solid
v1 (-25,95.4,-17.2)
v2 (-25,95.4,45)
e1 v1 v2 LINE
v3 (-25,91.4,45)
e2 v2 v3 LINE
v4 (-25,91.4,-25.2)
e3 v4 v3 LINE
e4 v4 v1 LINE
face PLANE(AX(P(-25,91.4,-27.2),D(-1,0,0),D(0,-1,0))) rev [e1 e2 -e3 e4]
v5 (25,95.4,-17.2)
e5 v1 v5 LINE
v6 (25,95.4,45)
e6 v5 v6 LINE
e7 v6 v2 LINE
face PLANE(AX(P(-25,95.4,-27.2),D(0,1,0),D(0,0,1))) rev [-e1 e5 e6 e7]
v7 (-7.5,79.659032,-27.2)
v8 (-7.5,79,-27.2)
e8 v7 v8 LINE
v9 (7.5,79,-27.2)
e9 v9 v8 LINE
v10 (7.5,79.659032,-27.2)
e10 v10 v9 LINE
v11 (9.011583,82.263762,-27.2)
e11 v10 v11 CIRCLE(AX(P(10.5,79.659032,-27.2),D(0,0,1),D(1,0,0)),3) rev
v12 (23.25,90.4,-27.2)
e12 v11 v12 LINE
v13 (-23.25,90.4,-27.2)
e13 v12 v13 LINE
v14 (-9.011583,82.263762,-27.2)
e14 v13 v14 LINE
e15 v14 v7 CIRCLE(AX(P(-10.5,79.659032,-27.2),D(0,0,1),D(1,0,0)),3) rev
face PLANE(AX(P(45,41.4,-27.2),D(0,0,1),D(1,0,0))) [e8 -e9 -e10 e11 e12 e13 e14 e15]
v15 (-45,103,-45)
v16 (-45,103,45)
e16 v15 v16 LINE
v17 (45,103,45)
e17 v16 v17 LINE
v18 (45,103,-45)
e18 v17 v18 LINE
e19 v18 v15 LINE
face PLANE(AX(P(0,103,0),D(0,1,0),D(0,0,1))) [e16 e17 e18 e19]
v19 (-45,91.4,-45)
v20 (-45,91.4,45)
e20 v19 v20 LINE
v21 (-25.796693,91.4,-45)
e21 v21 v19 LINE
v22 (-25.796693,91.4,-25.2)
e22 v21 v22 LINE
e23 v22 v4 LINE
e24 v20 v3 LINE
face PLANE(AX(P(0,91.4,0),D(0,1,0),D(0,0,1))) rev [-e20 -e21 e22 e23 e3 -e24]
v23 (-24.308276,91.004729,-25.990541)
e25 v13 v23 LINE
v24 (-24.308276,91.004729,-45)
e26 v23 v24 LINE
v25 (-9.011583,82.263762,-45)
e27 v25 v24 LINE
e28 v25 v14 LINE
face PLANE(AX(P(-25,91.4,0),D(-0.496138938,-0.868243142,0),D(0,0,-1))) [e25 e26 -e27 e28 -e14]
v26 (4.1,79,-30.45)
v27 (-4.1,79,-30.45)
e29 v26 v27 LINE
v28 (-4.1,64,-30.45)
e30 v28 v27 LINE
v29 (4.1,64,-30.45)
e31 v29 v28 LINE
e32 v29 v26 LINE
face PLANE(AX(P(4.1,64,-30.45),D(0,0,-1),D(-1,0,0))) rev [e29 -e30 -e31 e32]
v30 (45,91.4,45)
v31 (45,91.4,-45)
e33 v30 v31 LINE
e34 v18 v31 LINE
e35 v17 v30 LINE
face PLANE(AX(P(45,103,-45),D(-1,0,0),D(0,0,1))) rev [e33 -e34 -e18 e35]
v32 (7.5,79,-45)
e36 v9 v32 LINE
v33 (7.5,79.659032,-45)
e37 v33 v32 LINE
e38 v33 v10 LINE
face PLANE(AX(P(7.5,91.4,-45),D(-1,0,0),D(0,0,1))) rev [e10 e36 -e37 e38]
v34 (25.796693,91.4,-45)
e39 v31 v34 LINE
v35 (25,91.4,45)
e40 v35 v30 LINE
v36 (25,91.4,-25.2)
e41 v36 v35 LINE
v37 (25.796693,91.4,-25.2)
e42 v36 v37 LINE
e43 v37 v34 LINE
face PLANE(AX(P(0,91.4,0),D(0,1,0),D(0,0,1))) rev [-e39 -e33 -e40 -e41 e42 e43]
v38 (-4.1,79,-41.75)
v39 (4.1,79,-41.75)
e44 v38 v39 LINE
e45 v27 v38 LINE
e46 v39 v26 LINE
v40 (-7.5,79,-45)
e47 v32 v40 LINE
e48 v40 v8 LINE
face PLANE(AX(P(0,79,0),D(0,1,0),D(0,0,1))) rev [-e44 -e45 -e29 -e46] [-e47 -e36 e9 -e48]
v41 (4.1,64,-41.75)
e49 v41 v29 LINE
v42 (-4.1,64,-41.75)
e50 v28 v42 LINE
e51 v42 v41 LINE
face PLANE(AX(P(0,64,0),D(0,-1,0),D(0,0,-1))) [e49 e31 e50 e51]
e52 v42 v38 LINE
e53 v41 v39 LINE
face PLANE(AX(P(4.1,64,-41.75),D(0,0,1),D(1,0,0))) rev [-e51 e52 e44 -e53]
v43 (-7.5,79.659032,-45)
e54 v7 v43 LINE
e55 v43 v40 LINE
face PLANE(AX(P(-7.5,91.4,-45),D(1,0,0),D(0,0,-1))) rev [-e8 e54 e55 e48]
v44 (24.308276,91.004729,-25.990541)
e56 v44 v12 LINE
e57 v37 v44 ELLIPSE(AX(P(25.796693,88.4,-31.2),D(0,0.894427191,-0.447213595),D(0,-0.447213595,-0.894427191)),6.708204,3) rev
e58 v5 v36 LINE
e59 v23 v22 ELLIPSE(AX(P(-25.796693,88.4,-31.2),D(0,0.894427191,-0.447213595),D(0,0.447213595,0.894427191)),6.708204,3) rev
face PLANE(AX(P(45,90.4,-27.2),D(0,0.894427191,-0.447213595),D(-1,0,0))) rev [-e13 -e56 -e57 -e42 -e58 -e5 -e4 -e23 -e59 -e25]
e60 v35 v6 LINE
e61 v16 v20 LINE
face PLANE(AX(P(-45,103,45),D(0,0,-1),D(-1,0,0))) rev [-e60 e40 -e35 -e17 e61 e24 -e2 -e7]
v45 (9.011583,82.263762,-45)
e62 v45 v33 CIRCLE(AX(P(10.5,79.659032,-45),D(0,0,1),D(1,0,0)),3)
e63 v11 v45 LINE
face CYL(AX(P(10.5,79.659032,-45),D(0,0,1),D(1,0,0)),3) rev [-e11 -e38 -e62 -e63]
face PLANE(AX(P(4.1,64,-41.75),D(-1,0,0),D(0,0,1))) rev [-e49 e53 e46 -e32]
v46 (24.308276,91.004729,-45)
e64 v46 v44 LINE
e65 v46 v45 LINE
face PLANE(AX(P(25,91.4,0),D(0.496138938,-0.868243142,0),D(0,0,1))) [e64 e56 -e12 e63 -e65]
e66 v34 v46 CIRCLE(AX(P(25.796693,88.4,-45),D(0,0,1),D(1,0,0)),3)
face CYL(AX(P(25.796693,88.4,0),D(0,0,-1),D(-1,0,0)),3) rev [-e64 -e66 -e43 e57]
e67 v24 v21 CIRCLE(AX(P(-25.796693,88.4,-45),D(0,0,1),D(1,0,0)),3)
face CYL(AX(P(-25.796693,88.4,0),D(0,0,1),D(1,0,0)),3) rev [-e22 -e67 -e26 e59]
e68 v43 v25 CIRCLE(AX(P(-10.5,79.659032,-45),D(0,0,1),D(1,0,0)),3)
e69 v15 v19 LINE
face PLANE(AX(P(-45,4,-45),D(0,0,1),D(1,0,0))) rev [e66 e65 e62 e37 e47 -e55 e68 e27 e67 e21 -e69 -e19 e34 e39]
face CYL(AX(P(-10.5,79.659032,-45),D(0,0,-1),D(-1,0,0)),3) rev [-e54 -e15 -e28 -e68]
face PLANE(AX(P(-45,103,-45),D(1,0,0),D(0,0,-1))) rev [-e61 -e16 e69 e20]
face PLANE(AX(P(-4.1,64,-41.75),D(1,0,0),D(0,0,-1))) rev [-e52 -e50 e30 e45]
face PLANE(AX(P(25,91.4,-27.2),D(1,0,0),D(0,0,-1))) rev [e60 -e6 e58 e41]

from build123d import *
from OCP.BRepFilletAPI import BRepFilletAPI_MakeChamfer

# Parameters (mm, degrees)
ESQUISSE2_W             = 90
ESQUISSE2_H             = 90
BOSS_EXTRU_1_DEPTH      = 4
ESQUISSE3_W             = 9.2
ESQUISSE3_H             = 10.3
BOSS_EXTRU_2_DEPTH      = 2.4
CONG_1_R                = 1
ESQUISSE5_W             = 14.85
ESQUISSE5_H             = 90
BOSS_EXTRU_3_DEPTH      = 2.4
ESQUISSE6_W             = 7
ESQUISSE6_H             = 5
BOSS_EXTRU_4_DEPTH      = 38
ESQUISSE8_W             = 14.85
ESQUISSE8_H             = 18
BOSS_EXTRU_5_DEPTH      = 38
BOSS_EXTRU_6_REACH      = 97.814
ESQUISSE9_W             = 7
ESQUISSE9_H             = 2
CONG_1_OF_SYM_TRIE1_R   = 1
ENL_V_MAT_EXTRU_1_REACH = 111.983
ESQUISSE10_W            = 2
ESQUISSE10_H            = 18
ENL_V_MAT_EXTRU_2_REACH = 77.38
ESQUISSE11_W            = 40
ESQUISSE11_H            = 18
ESQUISSE12_W            = 5
ESQUISSE12_H            = 8.6
BOSS_EXTRU_7_DEPTH      = 60.3
ESQUISSE13_W            = 6.9
ESQUISSE13_H            = 7.6
BOSS_EXTRU_8_DEPTH      = 2.45
CONG_2_R                = 1
CONG_2_OF_SYM_TRIE2_R   = 1
BOSS_EXTRU_9_DEPTH      = 3
BOSS_EXTRU_9_DEPTH_BACK = 3
ESQUISSE14_W            = 90
ESQUISSE14_H            = 17.8
ESQUISSE15_W            = 15
ESQUISSE15_H            = 17.8
BOSS_EXTRU_10_DEPTH     = 44
ESQUISSE16_W            = 90
ESQUISSE16_H            = 90
BOSS_EXTRU_11_DEPTH     = 11.6
ESQUISSE20_W            = 12
ESQUISSE20_H            = 6.4
BOSS_EXTRU_13_DEPTH     = 10
ESQUISSE21_W            = 12
ESQUISSE21_H            = 6.4
BOSS_EXTRU_14_DEPTH     = 10
CONG_3_R                = 6
ENL_V_MAT_EXTRU_4_REACH = 126.022
ESQUISSE23_R            = 2.3
CONG_3_OF_SYM_TRIE3_R   = 6
ENL_V_MAT_EXTRU_5_REACH = 126.022
ESQUISSE24_R            = 1.75
ENL_V_MAT_EXTRU_6_REACH = 137.909
ESQUISSE26_R            = 1.75
ESQUISSE27_W            = 50
ESQUISSE27_H            = 4
ENL_V_MAT_EXTRU_7_DEPTH = 72.2
CHANFREIN3_SIZE         = 28.5
CHANFREIN3_SIZE2        = 9.5
CHANFREIN4_SIZE         = 10
CHANFREIN4_SIZE2        = 17.5
CHANFREIN8_START        = -45
CHANFREIN8_DEPTH        = 17.8
CHANFREIN9_SIZE         = 3
CHANFREIN9_SIZE_2       = 9
CHANFREIN10_START       = 25.930676813
CHANFREIN10_OUTLINE_W   = 40
CHANFREIN10_OUTLINE_H   = 3.16227766
CHANFREIN10_DEPTH       = 2.069323187
CONG_9_R                = 3
ESQUISSE37_R            = 4
ENL_V_MAT_EXTRU_8_DEPTH = 3
BOSS_EXTRU_15_DEPTH     = 4.8
CONG_11_R               = 3
CHANFREIN14_SIZE        = 10
CHANFREIN14_SIZE2       = 5
ESQUISSE39_W            = 110.537037217
ESQUISSE39_H            = 103.424550411
ENL_V_MAT_EXTRU_9_DEPTH = 79
ESQUISSE40_W            = 8.2
ESQUISSE40_H            = 11.3
BOSS_EXTRU_16_DEPTH     = 15


with BuildPart() as part:
    # Esquisse2 → Boss.-Extru.1 (new body)
    with BuildSketch(Plane(origin=(0, 0, 0), x_dir=(1, 0, 0), z_dir=(0, 1, 0))):
        Rectangle(ESQUISSE2_W, ESQUISSE2_H)
    extrude(amount=BOSS_EXTRU_1_DEPTH)

    # Esquisse3 → Boss.-Extru.2 (add)
    with BuildSketch(Plane(origin=(0, 4, 0), x_dir=(1, 0, 0), z_dir=(0, 1, 0))):
        with Locations((25.55, -6)):
            Rectangle(ESQUISSE3_W, ESQUISSE3_H)
    boss_extru_2 = extrude(amount=BOSS_EXTRU_2_DEPTH)

    # Congé1
    cong_1_edges = [part.edges().sort_by_distance(p)[0] for p in [
        (20.95, 5.2, 0.85),
        (20.95, 5.2, 11.15),
    ]]
    fillet(cong_1_edges, radius=CONG_1_R)

    # Esquisse5 → Boss.-Extru.3 (add)
    with BuildSketch(Plane(origin=(0, 4, 0), x_dir=(1, 0, 0), z_dir=(0, 1, 0))):
        with Locations((37.575, 0)):
            Rectangle(ESQUISSE5_W, ESQUISSE5_H)
    boss_extru_3 = extrude(amount=BOSS_EXTRU_3_DEPTH)

    # Esquisse6 → Boss.-Extru.4 (add)
    with BuildSketch(Plane(origin=(0, 6.4, 0), x_dir=(1, 0, 0), z_dir=(0, 1, 0))):
        with Locations((33.65, -42.5)):
            Rectangle(ESQUISSE6_W, ESQUISSE6_H)
    boss_extru_4 = extrude(amount=BOSS_EXTRU_4_DEPTH)

    # Esquisse8 → Boss.-Extru.5 (add)
    with BuildSketch(Plane(origin=(0, 6.4, 0), x_dir=(1, 0, 0), z_dir=(0, 1, 0))):
        with Locations((37.575, 36)):
            Rectangle(ESQUISSE8_W, ESQUISSE8_H)
    boss_extru_5 = extrude(amount=BOSS_EXTRU_5_DEPTH)

    # Esquisse9 → Boss.-Extru.6 (add, up to next)
    with BuildSketch(Plane.XY.offset(-27), mode=Mode.PRIVATE) as boss_extru_6_sk1:
        with Locations((33.65, 43.4)):
            Rectangle(ESQUISSE9_W, ESQUISSE9_H)
    boss_extru_6_tool1 = extrude(boss_extru_6_sk1.sketch, amount=BOSS_EXTRU_6_REACH, mode=Mode.PRIVATE) - part.part
    boss_extru_6 = boss_extru_6_tool1.solids().sort_by_distance((33.65, 43.4, -27))[0]
    add(boss_extru_6)

    # Symétrie1: Boss.-Extru.2, Boss.-Extru.3, Boss.-Extru.4, Boss.-Extru.5, Boss.-Extru.6 across plane
    add(boss_extru_2.mirror(Plane(origin=(0, 0, 0), x_dir=(0, 0, 1), z_dir=(1, 0, 0))))
    add(boss_extru_3.mirror(Plane(origin=(0, 0, 0), x_dir=(0, 0, 1), z_dir=(1, 0, 0))))
    add(boss_extru_4.mirror(Plane(origin=(0, 0, 0), x_dir=(0, 0, 1), z_dir=(1, 0, 0))))
    add(boss_extru_5.mirror(Plane(origin=(0, 0, 0), x_dir=(0, 0, 1), z_dir=(1, 0, 0))))
    add(boss_extru_6.mirror(Plane(origin=(0, 0, 0), x_dir=(0, 0, 1), z_dir=(1, 0, 0))))

    # Congé1 of Symétrie1
    cong_1_of_sym_trie1_edges = [part.edges().sort_by_distance(p)[0] for p in [
        (-20.95, 5.2, 0.85),
        (-20.95, 5.2, 11.15),
    ]]
    fillet(cong_1_of_sym_trie1_edges, radius=CONG_1_OF_SYM_TRIE1_R)

    # Esquisse10 → Enlèv. mat.-Extru.1 (cut, up to next)
    with BuildSketch(Plane.XY.offset(45), mode=Mode.PRIVATE) as enl_v_mat_extru_1_sk1:
        with Locations((-31.15, 26.85)):
            Rectangle(ESQUISSE10_W, ESQUISSE10_H)
    enl_v_mat_extru_1_tool1 = extrude(enl_v_mat_extru_1_sk1.sketch, amount=-ENL_V_MAT_EXTRU_1_REACH, mode=Mode.PRIVATE) & part.part
    add(enl_v_mat_extru_1_tool1.solids().sort_by_distance((-31.15, 26.85, 45))[0], mode=Mode.SUBTRACT)

    # Esquisse11 → Enlèv. mat.-Extru.2 (cut, up to next)
    with BuildSketch(Plane(origin=(0, 4, 0), x_dir=(1, 0, 0), z_dir=(0, 1, 0)), mode=Mode.PRIVATE) as enl_v_mat_extru_2_sk1:
        with Locations((0, 36)):
            Rectangle(ESQUISSE11_W, ESQUISSE11_H)
    enl_v_mat_extru_2_tool1 = extrude(enl_v_mat_extru_2_sk1.sketch, amount=-ENL_V_MAT_EXTRU_2_REACH, mode=Mode.PRIVATE) & part.part
    add(enl_v_mat_extru_2_tool1.solids().sort_by_distance((0, 4, -36))[0], mode=Mode.SUBTRACT)

    # Esquisse12 → Boss.-Extru.7 (add)
    with BuildSketch(Plane(origin=(-30.15, 0, 0), x_dir=(0, 0, -1), z_dir=(1, 0, 0))):
        with Locations((29.5, 29.34)):
            Rectangle(ESQUISSE12_W, ESQUISSE12_H)
    extrude(amount=BOSS_EXTRU_7_DEPTH)

    # Esquisse13 → Boss.-Extru.8 (add)
    with BuildSketch(Plane.XY.offset(-27)):
        with Locations((24.4, 29.84)):
            Rectangle(ESQUISSE13_W, ESQUISSE13_H)
    boss_extru_8 = extrude(amount=BOSS_EXTRU_8_DEPTH)

    # Congé2
    cong_2_edges = [part.edges().sort_by_distance(p)[0] for p in [
        (20.95, 33.64, -25.775),
        (20.95, 26.04, -25.775),
    ]]
    fillet(cong_2_edges, radius=CONG_2_R)

    # Symétrie2: Boss.-Extru.8 across plane
    add(boss_extru_8.mirror(Plane(origin=(0, 0, 0), x_dir=(0, 0, 1), z_dir=(1, 0, 0))))

    # Congé2 of Symétrie2
    cong_2_of_sym_trie2_edges = [part.edges().sort_by_distance(p)[0] for p in [
        (-20.95, 33.64, -25.775),
        (-20.95, 26.04, -25.775),
    ]]
    fillet(cong_2_of_sym_trie2_edges, radius=CONG_2_OF_SYM_TRIE2_R)

    # Esquisse14 → Boss.-Extru.9 (add, two sides: drawn at the far end of the back side and taken through both)
    with BuildSketch(Plane(origin=(0, 44.4, 0), x_dir=(1, 0, 0), z_dir=(0, 1, 0)).offset(-BOSS_EXTRU_9_DEPTH_BACK)):
        with Locations((0, 36.1)):
            Rectangle(ESQUISSE14_W, ESQUISSE14_H)
    extrude(amount=BOSS_EXTRU_9_DEPTH + BOSS_EXTRU_9_DEPTH_BACK)

    # Esquisse15 → Boss.-Extru.10 (add)
    with BuildSketch(Plane(origin=(0, 47.4, 0), x_dir=(1, 0, 0), z_dir=(0, 1, 0))):
        with Locations((0, 36.1)):
            Rectangle(ESQUISSE15_W, ESQUISSE15_H)
    extrude(amount=BOSS_EXTRU_10_DEPTH)

    # Esquisse16 → Boss.-Extru.11 (add)
    with BuildSketch(Plane(origin=(0, 91.4, 0), x_dir=(1, 0, 0), z_dir=(0, 1, 0))):
        Rectangle(ESQUISSE16_W, ESQUISSE16_H)
    extrude(amount=BOSS_EXTRU_11_DEPTH)

    # Esquisse20 → Boss.-Extru.13 (add)
    with BuildSketch(Plane(origin=(45, 0, 0), x_dir=(0, 0, -1), z_dir=(1, 0, 0))):
        with Locations((-11, 3.2)):
            Rectangle(ESQUISSE20_W, ESQUISSE20_H)
    boss_extru_13 = extrude(amount=BOSS_EXTRU_13_DEPTH)

    # Esquisse21 → Boss.-Extru.14 (add)
    with BuildSketch(Plane(origin=(0, 0, -45), x_dir=(-1, 0, 0), z_dir=(0, 0, -1))):
        with Locations((-39, 3.2)):
            Rectangle(ESQUISSE21_W, ESQUISSE21_H)
    boss_extru_14 = extrude(amount=BOSS_EXTRU_14_DEPTH)

    # Congé3
    cong_3_edges = [part.edges().sort_by_distance(p)[0] for p in [
        (33, 3.2, -55),
        (45, 3.2, -55),
        (55, 3.2, 5),
        (55, 3.2, 17),
    ]]
    fillet(cong_3_edges, radius=CONG_3_R - 0.0001)  # a hair under: the kernel refuses the full size

    # Esquisse23 → Enlèv. mat.-Extru.4 (cut, up to next)
    with BuildSketch(Plane(origin=(0, 6.4, 0), x_dir=(1, 0, 0), z_dir=(0, 1, 0)), mode=Mode.PRIVATE) as enl_v_mat_extru_4_sk1:
        with Locations(Location((50, -11, 0), (0, 0, 270))):
            Circle(ESQUISSE23_R)
    enl_v_mat_extru_4_tool1 = extrude(enl_v_mat_extru_4_sk1.sketch, amount=-ENL_V_MAT_EXTRU_4_REACH, mode=Mode.PRIVATE) & part.part
    # Esquisse23 → Enlèv. mat.-Extru.4 (cut, up to next)
    with BuildSketch(Plane(origin=(0, 6.4, 0), x_dir=(1, 0, 0), z_dir=(0, 1, 0)), mode=Mode.PRIVATE) as enl_v_mat_extru_4_sk2:
        with Locations(Location((39, 50, 0), (0, 0, 270))):
            Circle(ESQUISSE23_R)
    enl_v_mat_extru_4_tool2 = extrude(enl_v_mat_extru_4_sk2.sketch, amount=-ENL_V_MAT_EXTRU_4_REACH, mode=Mode.PRIVATE) & part.part
    enl_v_mat_extru_4_1 = enl_v_mat_extru_4_tool1.solids().sort_by_distance((50, 6.4, 11))[0]
    add(enl_v_mat_extru_4_1, mode=Mode.SUBTRACT)
    enl_v_mat_extru_4_2 = enl_v_mat_extru_4_tool2.solids().sort_by_distance((39, 6.4, -50))[0]
    add(enl_v_mat_extru_4_2, mode=Mode.SUBTRACT)
    enl_v_mat_extru_4 = enl_v_mat_extru_4_1 + enl_v_mat_extru_4_2  # Enlèv. mat.-Extru.4 as one shape, for the pattern or mirror that repeats it

    # Symétrie3: Boss.-Extru.13, Boss.-Extru.14, Enlèv. mat.-Extru.4 across plane
    add(boss_extru_13.mirror(Plane(origin=(0, 0, 0), x_dir=(0, 0, 1), z_dir=(1, 0, 0))))
    add(boss_extru_14.mirror(Plane(origin=(0, 0, 0), x_dir=(0, 0, 1), z_dir=(1, 0, 0))))
    add(enl_v_mat_extru_4.mirror(Plane(origin=(0, 0, 0), x_dir=(0, 0, 1), z_dir=(1, 0, 0))), mode=Mode.SUBTRACT)

    # Congé3 of Symétrie3
    cong_3_of_sym_trie3_edges = [part.edges().sort_by_distance(p)[0] for p in [
        (-33, 3.2, -55),
        (-45, 3.2, -55),
        (-55, 3.2, 5),
        (-55, 3.2, 17),
    ]]
    fillet(cong_3_of_sym_trie3_edges, radius=CONG_3_OF_SYM_TRIE3_R - 0.0001)  # a hair under: the kernel refuses the full size

    # Esquisse24 → Enlèv. mat.-Extru.5 (cut, up to next)
    with BuildSketch(Plane(origin=(0, 6.4, 0), x_dir=(1, 0, 0), z_dir=(0, 1, 0)), mode=Mode.PRIVATE) as enl_v_mat_extru_5_sk1:
        with Locations(Location((25.45, -6, 0), (0, 0, 270))):
            Circle(ESQUISSE24_R)
    enl_v_mat_extru_5_tool1 = extrude(enl_v_mat_extru_5_sk1.sketch, amount=-ENL_V_MAT_EXTRU_5_REACH, mode=Mode.PRIVATE) & part.part
    enl_v_mat_extru_5 = enl_v_mat_extru_5_tool1.solids().sort_by_distance((25.45, 6.4, 6))[0]
    add(enl_v_mat_extru_5, mode=Mode.SUBTRACT)

    # Esquisse26 → Enlèv. mat.-Extru.6 (cut, up to next)
    with BuildSketch(Plane.XY.offset(-24.55), mode=Mode.PRIVATE) as enl_v_mat_extru_6_sk1:
        with Locations((25.55, 28.44)):
            Circle(ESQUISSE26_R)
    enl_v_mat_extru_6_tool1 = extrude(enl_v_mat_extru_6_sk1.sketch, amount=-ENL_V_MAT_EXTRU_6_REACH, mode=Mode.PRIVATE) & part.part
    enl_v_mat_extru_6 = enl_v_mat_extru_6_tool1.solids().sort_by_distance((25.55, 28.44, -24.55))[0]
    add(enl_v_mat_extru_6, mode=Mode.SUBTRACT)

    # Symétrie5: Enlèv. mat.-Extru.5, Enlèv. mat.-Extru.6 across plane
    add(enl_v_mat_extru_5.mirror(Plane(origin=(0, 0, 0), x_dir=(0, 0, 1), z_dir=(1, 0, 0))), mode=Mode.SUBTRACT)
    add(enl_v_mat_extru_6.mirror(Plane(origin=(0, 0, 0), x_dir=(0, 0, 1), z_dir=(1, 0, 0))), mode=Mode.SUBTRACT)

    # Esquisse27 → Enlèv. mat.-Extru.7 (cut)
    with BuildSketch(Plane.XY.offset(45)):
        with Locations((0, 93.4)):
            Rectangle(ESQUISSE27_W, ESQUISSE27_H)
    extrude(amount=-ENL_V_MAT_EXTRU_7_DEPTH, mode=Mode.SUBTRACT)

    # Chanfrein3: one chamfer whose edges measure the first distance from different faces: ONE call of the kernel's chamfer builder (chamfer() names one face for all edges)
    chanfrein3_edges_1 = [part.edges().sort_by_distance(p)[0] for p in [
        (-7.5, 47.4, -36.1),
    ]]
    chanfrein3_side_1 = [part.faces().sort_by_distance(p)[0] for p in [
        (-26.25, 47.4, -36.1),
    ]]
    chanfrein3_edges_2 = [part.edges().sort_by_distance(p)[0] for p in [
        (7.5, 47.4, -36.1),
    ]]
    chanfrein3_side_2 = [part.faces().sort_by_distance(p)[0] for p in [
        (26.25, 47.4, -36.1),
    ]]
    chanfrein3 = BRepFilletAPI_MakeChamfer(part.part.solid().wrapped)
    for e in chanfrein3_edges_1:
        chanfrein3.Add(CHANFREIN3_SIZE, CHANFREIN3_SIZE2, e.wrapped, chanfrein3_side_1[0].wrapped)  # the first distance lies on this face
    for e in chanfrein3_edges_2:
        chanfrein3.Add(CHANFREIN3_SIZE, CHANFREIN3_SIZE2, e.wrapped, chanfrein3_side_2[0].wrapped)  # the first distance lies on this face
    add(Compound.cast(chanfrein3.Shape()), mode=Mode.REPLACE)

    # Chanfrein4: one chamfer whose edges measure the first distance from different faces: ONE call of the kernel's chamfer builder (chamfer() names one face for all edges)
    chanfrein4_edges_1 = [part.edges().sort_by_distance(p)[0] for p in [
        (7.5, 91.4, -36.1),
    ]]
    chanfrein4_side_1 = [part.faces().sort_by_distance(p)[0] for p in [
        (7.5, 74.15, -36.1),
    ]]
    chanfrein4_edges_2 = [part.edges().sort_by_distance(p)[0] for p in [
        (-7.5, 91.4, -36.1),
    ]]
    chanfrein4_side_2 = [part.faces().sort_by_distance(p)[0] for p in [
        (-7.5, 74.15, -36.1),
    ]]
    chanfrein4 = BRepFilletAPI_MakeChamfer(part.part.solid().wrapped)
    for e in chanfrein4_edges_1:
        chanfrein4.Add(CHANFREIN4_SIZE, CHANFREIN4_SIZE2, e.wrapped, chanfrein4_side_1[0].wrapped)  # the first distance lies on this face
    for e in chanfrein4_edges_2:
        chanfrein4.Add(CHANFREIN4_SIZE, CHANFREIN4_SIZE2, e.wrapped, chanfrein4_side_2[0].wrapped)  # the first distance lies on this face
    add(Compound.cast(chanfrein4.Shape()), mode=Mode.REPLACE)

    # Chanfrein8: read off the stored shape, not the designer's step
    # Chanfrein8 outline → Chanfrein8 (add)
    with BuildSketch(Plane.XY.offset(CHANFREIN8_START)):
        Polygon((30.15, 31.35), (30.15, 41.4), (0, 41.4), align=None)
    extrude(amount=CHANFREIN8_DEPTH)

    # Chanfrein9
    chanfrein9_edges_1 = [part.edges().sort_by_distance(p)[0] for p in [
        (45, 47.4, -36.1),
    ]]
    chanfrein9_side_1 = [part.faces().sort_by_distance(p)[0] for p in [
        (45, 47.34, -36.1),
    ]]
    chanfrein9_edges_2 = [part.edges().sort_by_distance(p)[0] for p in [
        (-45, 47.4, -36.1),
    ]]
    chanfrein9_side_2 = [part.faces().sort_by_distance(p)[0] for p in [
        (-44.94, 47.4, -36.1),
    ]]
    chanfrein9 = BRepFilletAPI_MakeChamfer(part.part.solid().wrapped)
    for e in chanfrein9_edges_1:
        chanfrein9.Add(CHANFREIN9_SIZE - 0.0001, CHANFREIN9_SIZE_2 - 0.0001, e.wrapped, chanfrein9_side_1[0].wrapped)
    for e in chanfrein9_edges_2:
        chanfrein9.Add(CHANFREIN9_SIZE_2 - 0.0001, CHANFREIN9_SIZE - 0.0001, e.wrapped, chanfrein9_side_2[0].wrapped)
    add(Compound.cast(chanfrein9.Shape()), mode=Mode.REPLACE)  # a hair under: the kernel refuses the full size

    # Chanfrein10: read off the stored shape, not the designer's step
    # Chanfrein10 outline → Chanfrein10 (cut)
    with BuildSketch(Plane(origin=(0, 0, 0), x_dir=(1, 0, 0), z_dir=(0, 0.31622776601683705, -0.9486832980505141)).offset(CHANFREIN10_START)):
        with Locations((0, 6.008327554)):
            Rectangle(CHANFREIN10_OUTLINE_W, CHANFREIN10_OUTLINE_H)
    extrude(amount=CHANFREIN10_DEPTH, mode=Mode.SUBTRACT)

    # Congé9
    cong_9_edges = [part.edges().sort_by_distance(p)[0] for p in [
        (-33.65, 44.4, 45),
        (-33.65, 6.4, 40),
        (-37.575, 6.4, -27),
        (-33.65, 42.4, 40),
        (-33.65, 42.4, -27),
        (33.65, 6.4, 40),
        (33.65, 44.4, 45),
        (37.575, 6.4, -27),
        (33.65, 42.4, 40),
        (33.65, 42.4, -27),
    ]]
    fillet(cong_9_edges, radius=CONG_9_R)

    # Chanfrein13
    # the kernel refuses this chamfer: 31.5, 10.5 mm, written as the material it adds along each edge
    with BuildSketch(Plane(origin=(-30.15, 41.4, -27.2), x_dir=(0, -1, 0), z_dir=(0, 0, -1))) as chanfrein13_piece_1:
        with BuildLine():
            Line((10.898446985, 1.195340956), (-0.398446985, -32.695340956))
            Line((-0.398446985, -32.695340956), (-1.028446985, -32.695340956))
            ThreePointArc((-1.028446985, -32.695340956), (-0.63, -16.347670478), (-0.63, 0))
            Line((-0.63, 0), (0, 0.63))
            ThreePointArc((0, 0.63), (5.449223493, 0.63), (10.898446985, 1.825340956))
            Line((10.898446985, 1.825340956), (10.898446985, 1.195340956))
        make_face()
    extrude(amount=17.8)

    # Esquisse37 → Enlèv. mat.-Extru.8 (cut)
    with BuildSketch(Plane.XZ):
        with Locations(Location((-25.45, 6, 0), (0, 0, 270))):
            Circle(ESQUISSE37_R)
        with Locations(Location((25.45, 6, 0), (0, 0, 270))):
            Circle(ESQUISSE37_R)
    extrude(amount=-ENL_V_MAT_EXTRU_8_DEPTH, mode=Mode.SUBTRACT)

    # Esquisse38 → Boss.-Extru.15 (add)
    with BuildSketch(Plane.XY.offset(-27.2)):
        Polygon((0.675, 41.175), (-21.95, 33.64), (23.28, 33.64), align=None)
    extrude(amount=-BOSS_EXTRU_15_DEPTH)

    # Congé11
    cong_11_edges = [part.edges().sort_by_distance(p)[0] for p in [
        (7.5, 56.9, -36.1),
        (-7.5, 56.9, -36.1),
        (-25, 91.4, -36.1),
        (-7.5, 81.4, -36.1),
        (25, 91.4, -36.1),
        (7.5, 81.4, -36.1),
        (30.15, 31.35, -38.5),
        (-30.15, 30.9, -38.5),
        (0.675, 41.175, -38.5),
    ]]
    fillet(cong_11_edges, radius=CONG_11_R)

    # Chanfrein14
    chanfrein14_edges = [part.edges().sort_by_distance(p)[0] for p in [
        (0, 95.4, -27.2),
    ]]
    chanfrein14_side = [part.faces().sort_by_distance(p)[0] for p in [
        (0, 95.4, 8.9),
    ]]
    chamfer(chanfrein14_edges, length=CHANFREIN14_SIZE, length2=CHANFREIN14_SIZE2, reference=chanfrein14_side[0])

    # Esquisse39 → Enlèv. mat.-Extru.9 (cut)
    with BuildSketch(Plane.XZ):
        with Locations((-0.268518609, -4.614943927)):
            Rectangle(ESQUISSE39_W, ESQUISSE39_H)
    extrude(amount=-ENL_V_MAT_EXTRU_9_DEPTH, mode=Mode.SUBTRACT)

    # Esquisse40 → Boss.-Extru.16 (add)
    with BuildSketch(Plane.XZ.offset(-79)):
        with Locations((0, -36.1)):
            Rectangle(ESQUISSE40_W, ESQUISSE40_H)
    extrude(amount=BOSS_EXTRU_16_DEPTH)


solid = part.part
